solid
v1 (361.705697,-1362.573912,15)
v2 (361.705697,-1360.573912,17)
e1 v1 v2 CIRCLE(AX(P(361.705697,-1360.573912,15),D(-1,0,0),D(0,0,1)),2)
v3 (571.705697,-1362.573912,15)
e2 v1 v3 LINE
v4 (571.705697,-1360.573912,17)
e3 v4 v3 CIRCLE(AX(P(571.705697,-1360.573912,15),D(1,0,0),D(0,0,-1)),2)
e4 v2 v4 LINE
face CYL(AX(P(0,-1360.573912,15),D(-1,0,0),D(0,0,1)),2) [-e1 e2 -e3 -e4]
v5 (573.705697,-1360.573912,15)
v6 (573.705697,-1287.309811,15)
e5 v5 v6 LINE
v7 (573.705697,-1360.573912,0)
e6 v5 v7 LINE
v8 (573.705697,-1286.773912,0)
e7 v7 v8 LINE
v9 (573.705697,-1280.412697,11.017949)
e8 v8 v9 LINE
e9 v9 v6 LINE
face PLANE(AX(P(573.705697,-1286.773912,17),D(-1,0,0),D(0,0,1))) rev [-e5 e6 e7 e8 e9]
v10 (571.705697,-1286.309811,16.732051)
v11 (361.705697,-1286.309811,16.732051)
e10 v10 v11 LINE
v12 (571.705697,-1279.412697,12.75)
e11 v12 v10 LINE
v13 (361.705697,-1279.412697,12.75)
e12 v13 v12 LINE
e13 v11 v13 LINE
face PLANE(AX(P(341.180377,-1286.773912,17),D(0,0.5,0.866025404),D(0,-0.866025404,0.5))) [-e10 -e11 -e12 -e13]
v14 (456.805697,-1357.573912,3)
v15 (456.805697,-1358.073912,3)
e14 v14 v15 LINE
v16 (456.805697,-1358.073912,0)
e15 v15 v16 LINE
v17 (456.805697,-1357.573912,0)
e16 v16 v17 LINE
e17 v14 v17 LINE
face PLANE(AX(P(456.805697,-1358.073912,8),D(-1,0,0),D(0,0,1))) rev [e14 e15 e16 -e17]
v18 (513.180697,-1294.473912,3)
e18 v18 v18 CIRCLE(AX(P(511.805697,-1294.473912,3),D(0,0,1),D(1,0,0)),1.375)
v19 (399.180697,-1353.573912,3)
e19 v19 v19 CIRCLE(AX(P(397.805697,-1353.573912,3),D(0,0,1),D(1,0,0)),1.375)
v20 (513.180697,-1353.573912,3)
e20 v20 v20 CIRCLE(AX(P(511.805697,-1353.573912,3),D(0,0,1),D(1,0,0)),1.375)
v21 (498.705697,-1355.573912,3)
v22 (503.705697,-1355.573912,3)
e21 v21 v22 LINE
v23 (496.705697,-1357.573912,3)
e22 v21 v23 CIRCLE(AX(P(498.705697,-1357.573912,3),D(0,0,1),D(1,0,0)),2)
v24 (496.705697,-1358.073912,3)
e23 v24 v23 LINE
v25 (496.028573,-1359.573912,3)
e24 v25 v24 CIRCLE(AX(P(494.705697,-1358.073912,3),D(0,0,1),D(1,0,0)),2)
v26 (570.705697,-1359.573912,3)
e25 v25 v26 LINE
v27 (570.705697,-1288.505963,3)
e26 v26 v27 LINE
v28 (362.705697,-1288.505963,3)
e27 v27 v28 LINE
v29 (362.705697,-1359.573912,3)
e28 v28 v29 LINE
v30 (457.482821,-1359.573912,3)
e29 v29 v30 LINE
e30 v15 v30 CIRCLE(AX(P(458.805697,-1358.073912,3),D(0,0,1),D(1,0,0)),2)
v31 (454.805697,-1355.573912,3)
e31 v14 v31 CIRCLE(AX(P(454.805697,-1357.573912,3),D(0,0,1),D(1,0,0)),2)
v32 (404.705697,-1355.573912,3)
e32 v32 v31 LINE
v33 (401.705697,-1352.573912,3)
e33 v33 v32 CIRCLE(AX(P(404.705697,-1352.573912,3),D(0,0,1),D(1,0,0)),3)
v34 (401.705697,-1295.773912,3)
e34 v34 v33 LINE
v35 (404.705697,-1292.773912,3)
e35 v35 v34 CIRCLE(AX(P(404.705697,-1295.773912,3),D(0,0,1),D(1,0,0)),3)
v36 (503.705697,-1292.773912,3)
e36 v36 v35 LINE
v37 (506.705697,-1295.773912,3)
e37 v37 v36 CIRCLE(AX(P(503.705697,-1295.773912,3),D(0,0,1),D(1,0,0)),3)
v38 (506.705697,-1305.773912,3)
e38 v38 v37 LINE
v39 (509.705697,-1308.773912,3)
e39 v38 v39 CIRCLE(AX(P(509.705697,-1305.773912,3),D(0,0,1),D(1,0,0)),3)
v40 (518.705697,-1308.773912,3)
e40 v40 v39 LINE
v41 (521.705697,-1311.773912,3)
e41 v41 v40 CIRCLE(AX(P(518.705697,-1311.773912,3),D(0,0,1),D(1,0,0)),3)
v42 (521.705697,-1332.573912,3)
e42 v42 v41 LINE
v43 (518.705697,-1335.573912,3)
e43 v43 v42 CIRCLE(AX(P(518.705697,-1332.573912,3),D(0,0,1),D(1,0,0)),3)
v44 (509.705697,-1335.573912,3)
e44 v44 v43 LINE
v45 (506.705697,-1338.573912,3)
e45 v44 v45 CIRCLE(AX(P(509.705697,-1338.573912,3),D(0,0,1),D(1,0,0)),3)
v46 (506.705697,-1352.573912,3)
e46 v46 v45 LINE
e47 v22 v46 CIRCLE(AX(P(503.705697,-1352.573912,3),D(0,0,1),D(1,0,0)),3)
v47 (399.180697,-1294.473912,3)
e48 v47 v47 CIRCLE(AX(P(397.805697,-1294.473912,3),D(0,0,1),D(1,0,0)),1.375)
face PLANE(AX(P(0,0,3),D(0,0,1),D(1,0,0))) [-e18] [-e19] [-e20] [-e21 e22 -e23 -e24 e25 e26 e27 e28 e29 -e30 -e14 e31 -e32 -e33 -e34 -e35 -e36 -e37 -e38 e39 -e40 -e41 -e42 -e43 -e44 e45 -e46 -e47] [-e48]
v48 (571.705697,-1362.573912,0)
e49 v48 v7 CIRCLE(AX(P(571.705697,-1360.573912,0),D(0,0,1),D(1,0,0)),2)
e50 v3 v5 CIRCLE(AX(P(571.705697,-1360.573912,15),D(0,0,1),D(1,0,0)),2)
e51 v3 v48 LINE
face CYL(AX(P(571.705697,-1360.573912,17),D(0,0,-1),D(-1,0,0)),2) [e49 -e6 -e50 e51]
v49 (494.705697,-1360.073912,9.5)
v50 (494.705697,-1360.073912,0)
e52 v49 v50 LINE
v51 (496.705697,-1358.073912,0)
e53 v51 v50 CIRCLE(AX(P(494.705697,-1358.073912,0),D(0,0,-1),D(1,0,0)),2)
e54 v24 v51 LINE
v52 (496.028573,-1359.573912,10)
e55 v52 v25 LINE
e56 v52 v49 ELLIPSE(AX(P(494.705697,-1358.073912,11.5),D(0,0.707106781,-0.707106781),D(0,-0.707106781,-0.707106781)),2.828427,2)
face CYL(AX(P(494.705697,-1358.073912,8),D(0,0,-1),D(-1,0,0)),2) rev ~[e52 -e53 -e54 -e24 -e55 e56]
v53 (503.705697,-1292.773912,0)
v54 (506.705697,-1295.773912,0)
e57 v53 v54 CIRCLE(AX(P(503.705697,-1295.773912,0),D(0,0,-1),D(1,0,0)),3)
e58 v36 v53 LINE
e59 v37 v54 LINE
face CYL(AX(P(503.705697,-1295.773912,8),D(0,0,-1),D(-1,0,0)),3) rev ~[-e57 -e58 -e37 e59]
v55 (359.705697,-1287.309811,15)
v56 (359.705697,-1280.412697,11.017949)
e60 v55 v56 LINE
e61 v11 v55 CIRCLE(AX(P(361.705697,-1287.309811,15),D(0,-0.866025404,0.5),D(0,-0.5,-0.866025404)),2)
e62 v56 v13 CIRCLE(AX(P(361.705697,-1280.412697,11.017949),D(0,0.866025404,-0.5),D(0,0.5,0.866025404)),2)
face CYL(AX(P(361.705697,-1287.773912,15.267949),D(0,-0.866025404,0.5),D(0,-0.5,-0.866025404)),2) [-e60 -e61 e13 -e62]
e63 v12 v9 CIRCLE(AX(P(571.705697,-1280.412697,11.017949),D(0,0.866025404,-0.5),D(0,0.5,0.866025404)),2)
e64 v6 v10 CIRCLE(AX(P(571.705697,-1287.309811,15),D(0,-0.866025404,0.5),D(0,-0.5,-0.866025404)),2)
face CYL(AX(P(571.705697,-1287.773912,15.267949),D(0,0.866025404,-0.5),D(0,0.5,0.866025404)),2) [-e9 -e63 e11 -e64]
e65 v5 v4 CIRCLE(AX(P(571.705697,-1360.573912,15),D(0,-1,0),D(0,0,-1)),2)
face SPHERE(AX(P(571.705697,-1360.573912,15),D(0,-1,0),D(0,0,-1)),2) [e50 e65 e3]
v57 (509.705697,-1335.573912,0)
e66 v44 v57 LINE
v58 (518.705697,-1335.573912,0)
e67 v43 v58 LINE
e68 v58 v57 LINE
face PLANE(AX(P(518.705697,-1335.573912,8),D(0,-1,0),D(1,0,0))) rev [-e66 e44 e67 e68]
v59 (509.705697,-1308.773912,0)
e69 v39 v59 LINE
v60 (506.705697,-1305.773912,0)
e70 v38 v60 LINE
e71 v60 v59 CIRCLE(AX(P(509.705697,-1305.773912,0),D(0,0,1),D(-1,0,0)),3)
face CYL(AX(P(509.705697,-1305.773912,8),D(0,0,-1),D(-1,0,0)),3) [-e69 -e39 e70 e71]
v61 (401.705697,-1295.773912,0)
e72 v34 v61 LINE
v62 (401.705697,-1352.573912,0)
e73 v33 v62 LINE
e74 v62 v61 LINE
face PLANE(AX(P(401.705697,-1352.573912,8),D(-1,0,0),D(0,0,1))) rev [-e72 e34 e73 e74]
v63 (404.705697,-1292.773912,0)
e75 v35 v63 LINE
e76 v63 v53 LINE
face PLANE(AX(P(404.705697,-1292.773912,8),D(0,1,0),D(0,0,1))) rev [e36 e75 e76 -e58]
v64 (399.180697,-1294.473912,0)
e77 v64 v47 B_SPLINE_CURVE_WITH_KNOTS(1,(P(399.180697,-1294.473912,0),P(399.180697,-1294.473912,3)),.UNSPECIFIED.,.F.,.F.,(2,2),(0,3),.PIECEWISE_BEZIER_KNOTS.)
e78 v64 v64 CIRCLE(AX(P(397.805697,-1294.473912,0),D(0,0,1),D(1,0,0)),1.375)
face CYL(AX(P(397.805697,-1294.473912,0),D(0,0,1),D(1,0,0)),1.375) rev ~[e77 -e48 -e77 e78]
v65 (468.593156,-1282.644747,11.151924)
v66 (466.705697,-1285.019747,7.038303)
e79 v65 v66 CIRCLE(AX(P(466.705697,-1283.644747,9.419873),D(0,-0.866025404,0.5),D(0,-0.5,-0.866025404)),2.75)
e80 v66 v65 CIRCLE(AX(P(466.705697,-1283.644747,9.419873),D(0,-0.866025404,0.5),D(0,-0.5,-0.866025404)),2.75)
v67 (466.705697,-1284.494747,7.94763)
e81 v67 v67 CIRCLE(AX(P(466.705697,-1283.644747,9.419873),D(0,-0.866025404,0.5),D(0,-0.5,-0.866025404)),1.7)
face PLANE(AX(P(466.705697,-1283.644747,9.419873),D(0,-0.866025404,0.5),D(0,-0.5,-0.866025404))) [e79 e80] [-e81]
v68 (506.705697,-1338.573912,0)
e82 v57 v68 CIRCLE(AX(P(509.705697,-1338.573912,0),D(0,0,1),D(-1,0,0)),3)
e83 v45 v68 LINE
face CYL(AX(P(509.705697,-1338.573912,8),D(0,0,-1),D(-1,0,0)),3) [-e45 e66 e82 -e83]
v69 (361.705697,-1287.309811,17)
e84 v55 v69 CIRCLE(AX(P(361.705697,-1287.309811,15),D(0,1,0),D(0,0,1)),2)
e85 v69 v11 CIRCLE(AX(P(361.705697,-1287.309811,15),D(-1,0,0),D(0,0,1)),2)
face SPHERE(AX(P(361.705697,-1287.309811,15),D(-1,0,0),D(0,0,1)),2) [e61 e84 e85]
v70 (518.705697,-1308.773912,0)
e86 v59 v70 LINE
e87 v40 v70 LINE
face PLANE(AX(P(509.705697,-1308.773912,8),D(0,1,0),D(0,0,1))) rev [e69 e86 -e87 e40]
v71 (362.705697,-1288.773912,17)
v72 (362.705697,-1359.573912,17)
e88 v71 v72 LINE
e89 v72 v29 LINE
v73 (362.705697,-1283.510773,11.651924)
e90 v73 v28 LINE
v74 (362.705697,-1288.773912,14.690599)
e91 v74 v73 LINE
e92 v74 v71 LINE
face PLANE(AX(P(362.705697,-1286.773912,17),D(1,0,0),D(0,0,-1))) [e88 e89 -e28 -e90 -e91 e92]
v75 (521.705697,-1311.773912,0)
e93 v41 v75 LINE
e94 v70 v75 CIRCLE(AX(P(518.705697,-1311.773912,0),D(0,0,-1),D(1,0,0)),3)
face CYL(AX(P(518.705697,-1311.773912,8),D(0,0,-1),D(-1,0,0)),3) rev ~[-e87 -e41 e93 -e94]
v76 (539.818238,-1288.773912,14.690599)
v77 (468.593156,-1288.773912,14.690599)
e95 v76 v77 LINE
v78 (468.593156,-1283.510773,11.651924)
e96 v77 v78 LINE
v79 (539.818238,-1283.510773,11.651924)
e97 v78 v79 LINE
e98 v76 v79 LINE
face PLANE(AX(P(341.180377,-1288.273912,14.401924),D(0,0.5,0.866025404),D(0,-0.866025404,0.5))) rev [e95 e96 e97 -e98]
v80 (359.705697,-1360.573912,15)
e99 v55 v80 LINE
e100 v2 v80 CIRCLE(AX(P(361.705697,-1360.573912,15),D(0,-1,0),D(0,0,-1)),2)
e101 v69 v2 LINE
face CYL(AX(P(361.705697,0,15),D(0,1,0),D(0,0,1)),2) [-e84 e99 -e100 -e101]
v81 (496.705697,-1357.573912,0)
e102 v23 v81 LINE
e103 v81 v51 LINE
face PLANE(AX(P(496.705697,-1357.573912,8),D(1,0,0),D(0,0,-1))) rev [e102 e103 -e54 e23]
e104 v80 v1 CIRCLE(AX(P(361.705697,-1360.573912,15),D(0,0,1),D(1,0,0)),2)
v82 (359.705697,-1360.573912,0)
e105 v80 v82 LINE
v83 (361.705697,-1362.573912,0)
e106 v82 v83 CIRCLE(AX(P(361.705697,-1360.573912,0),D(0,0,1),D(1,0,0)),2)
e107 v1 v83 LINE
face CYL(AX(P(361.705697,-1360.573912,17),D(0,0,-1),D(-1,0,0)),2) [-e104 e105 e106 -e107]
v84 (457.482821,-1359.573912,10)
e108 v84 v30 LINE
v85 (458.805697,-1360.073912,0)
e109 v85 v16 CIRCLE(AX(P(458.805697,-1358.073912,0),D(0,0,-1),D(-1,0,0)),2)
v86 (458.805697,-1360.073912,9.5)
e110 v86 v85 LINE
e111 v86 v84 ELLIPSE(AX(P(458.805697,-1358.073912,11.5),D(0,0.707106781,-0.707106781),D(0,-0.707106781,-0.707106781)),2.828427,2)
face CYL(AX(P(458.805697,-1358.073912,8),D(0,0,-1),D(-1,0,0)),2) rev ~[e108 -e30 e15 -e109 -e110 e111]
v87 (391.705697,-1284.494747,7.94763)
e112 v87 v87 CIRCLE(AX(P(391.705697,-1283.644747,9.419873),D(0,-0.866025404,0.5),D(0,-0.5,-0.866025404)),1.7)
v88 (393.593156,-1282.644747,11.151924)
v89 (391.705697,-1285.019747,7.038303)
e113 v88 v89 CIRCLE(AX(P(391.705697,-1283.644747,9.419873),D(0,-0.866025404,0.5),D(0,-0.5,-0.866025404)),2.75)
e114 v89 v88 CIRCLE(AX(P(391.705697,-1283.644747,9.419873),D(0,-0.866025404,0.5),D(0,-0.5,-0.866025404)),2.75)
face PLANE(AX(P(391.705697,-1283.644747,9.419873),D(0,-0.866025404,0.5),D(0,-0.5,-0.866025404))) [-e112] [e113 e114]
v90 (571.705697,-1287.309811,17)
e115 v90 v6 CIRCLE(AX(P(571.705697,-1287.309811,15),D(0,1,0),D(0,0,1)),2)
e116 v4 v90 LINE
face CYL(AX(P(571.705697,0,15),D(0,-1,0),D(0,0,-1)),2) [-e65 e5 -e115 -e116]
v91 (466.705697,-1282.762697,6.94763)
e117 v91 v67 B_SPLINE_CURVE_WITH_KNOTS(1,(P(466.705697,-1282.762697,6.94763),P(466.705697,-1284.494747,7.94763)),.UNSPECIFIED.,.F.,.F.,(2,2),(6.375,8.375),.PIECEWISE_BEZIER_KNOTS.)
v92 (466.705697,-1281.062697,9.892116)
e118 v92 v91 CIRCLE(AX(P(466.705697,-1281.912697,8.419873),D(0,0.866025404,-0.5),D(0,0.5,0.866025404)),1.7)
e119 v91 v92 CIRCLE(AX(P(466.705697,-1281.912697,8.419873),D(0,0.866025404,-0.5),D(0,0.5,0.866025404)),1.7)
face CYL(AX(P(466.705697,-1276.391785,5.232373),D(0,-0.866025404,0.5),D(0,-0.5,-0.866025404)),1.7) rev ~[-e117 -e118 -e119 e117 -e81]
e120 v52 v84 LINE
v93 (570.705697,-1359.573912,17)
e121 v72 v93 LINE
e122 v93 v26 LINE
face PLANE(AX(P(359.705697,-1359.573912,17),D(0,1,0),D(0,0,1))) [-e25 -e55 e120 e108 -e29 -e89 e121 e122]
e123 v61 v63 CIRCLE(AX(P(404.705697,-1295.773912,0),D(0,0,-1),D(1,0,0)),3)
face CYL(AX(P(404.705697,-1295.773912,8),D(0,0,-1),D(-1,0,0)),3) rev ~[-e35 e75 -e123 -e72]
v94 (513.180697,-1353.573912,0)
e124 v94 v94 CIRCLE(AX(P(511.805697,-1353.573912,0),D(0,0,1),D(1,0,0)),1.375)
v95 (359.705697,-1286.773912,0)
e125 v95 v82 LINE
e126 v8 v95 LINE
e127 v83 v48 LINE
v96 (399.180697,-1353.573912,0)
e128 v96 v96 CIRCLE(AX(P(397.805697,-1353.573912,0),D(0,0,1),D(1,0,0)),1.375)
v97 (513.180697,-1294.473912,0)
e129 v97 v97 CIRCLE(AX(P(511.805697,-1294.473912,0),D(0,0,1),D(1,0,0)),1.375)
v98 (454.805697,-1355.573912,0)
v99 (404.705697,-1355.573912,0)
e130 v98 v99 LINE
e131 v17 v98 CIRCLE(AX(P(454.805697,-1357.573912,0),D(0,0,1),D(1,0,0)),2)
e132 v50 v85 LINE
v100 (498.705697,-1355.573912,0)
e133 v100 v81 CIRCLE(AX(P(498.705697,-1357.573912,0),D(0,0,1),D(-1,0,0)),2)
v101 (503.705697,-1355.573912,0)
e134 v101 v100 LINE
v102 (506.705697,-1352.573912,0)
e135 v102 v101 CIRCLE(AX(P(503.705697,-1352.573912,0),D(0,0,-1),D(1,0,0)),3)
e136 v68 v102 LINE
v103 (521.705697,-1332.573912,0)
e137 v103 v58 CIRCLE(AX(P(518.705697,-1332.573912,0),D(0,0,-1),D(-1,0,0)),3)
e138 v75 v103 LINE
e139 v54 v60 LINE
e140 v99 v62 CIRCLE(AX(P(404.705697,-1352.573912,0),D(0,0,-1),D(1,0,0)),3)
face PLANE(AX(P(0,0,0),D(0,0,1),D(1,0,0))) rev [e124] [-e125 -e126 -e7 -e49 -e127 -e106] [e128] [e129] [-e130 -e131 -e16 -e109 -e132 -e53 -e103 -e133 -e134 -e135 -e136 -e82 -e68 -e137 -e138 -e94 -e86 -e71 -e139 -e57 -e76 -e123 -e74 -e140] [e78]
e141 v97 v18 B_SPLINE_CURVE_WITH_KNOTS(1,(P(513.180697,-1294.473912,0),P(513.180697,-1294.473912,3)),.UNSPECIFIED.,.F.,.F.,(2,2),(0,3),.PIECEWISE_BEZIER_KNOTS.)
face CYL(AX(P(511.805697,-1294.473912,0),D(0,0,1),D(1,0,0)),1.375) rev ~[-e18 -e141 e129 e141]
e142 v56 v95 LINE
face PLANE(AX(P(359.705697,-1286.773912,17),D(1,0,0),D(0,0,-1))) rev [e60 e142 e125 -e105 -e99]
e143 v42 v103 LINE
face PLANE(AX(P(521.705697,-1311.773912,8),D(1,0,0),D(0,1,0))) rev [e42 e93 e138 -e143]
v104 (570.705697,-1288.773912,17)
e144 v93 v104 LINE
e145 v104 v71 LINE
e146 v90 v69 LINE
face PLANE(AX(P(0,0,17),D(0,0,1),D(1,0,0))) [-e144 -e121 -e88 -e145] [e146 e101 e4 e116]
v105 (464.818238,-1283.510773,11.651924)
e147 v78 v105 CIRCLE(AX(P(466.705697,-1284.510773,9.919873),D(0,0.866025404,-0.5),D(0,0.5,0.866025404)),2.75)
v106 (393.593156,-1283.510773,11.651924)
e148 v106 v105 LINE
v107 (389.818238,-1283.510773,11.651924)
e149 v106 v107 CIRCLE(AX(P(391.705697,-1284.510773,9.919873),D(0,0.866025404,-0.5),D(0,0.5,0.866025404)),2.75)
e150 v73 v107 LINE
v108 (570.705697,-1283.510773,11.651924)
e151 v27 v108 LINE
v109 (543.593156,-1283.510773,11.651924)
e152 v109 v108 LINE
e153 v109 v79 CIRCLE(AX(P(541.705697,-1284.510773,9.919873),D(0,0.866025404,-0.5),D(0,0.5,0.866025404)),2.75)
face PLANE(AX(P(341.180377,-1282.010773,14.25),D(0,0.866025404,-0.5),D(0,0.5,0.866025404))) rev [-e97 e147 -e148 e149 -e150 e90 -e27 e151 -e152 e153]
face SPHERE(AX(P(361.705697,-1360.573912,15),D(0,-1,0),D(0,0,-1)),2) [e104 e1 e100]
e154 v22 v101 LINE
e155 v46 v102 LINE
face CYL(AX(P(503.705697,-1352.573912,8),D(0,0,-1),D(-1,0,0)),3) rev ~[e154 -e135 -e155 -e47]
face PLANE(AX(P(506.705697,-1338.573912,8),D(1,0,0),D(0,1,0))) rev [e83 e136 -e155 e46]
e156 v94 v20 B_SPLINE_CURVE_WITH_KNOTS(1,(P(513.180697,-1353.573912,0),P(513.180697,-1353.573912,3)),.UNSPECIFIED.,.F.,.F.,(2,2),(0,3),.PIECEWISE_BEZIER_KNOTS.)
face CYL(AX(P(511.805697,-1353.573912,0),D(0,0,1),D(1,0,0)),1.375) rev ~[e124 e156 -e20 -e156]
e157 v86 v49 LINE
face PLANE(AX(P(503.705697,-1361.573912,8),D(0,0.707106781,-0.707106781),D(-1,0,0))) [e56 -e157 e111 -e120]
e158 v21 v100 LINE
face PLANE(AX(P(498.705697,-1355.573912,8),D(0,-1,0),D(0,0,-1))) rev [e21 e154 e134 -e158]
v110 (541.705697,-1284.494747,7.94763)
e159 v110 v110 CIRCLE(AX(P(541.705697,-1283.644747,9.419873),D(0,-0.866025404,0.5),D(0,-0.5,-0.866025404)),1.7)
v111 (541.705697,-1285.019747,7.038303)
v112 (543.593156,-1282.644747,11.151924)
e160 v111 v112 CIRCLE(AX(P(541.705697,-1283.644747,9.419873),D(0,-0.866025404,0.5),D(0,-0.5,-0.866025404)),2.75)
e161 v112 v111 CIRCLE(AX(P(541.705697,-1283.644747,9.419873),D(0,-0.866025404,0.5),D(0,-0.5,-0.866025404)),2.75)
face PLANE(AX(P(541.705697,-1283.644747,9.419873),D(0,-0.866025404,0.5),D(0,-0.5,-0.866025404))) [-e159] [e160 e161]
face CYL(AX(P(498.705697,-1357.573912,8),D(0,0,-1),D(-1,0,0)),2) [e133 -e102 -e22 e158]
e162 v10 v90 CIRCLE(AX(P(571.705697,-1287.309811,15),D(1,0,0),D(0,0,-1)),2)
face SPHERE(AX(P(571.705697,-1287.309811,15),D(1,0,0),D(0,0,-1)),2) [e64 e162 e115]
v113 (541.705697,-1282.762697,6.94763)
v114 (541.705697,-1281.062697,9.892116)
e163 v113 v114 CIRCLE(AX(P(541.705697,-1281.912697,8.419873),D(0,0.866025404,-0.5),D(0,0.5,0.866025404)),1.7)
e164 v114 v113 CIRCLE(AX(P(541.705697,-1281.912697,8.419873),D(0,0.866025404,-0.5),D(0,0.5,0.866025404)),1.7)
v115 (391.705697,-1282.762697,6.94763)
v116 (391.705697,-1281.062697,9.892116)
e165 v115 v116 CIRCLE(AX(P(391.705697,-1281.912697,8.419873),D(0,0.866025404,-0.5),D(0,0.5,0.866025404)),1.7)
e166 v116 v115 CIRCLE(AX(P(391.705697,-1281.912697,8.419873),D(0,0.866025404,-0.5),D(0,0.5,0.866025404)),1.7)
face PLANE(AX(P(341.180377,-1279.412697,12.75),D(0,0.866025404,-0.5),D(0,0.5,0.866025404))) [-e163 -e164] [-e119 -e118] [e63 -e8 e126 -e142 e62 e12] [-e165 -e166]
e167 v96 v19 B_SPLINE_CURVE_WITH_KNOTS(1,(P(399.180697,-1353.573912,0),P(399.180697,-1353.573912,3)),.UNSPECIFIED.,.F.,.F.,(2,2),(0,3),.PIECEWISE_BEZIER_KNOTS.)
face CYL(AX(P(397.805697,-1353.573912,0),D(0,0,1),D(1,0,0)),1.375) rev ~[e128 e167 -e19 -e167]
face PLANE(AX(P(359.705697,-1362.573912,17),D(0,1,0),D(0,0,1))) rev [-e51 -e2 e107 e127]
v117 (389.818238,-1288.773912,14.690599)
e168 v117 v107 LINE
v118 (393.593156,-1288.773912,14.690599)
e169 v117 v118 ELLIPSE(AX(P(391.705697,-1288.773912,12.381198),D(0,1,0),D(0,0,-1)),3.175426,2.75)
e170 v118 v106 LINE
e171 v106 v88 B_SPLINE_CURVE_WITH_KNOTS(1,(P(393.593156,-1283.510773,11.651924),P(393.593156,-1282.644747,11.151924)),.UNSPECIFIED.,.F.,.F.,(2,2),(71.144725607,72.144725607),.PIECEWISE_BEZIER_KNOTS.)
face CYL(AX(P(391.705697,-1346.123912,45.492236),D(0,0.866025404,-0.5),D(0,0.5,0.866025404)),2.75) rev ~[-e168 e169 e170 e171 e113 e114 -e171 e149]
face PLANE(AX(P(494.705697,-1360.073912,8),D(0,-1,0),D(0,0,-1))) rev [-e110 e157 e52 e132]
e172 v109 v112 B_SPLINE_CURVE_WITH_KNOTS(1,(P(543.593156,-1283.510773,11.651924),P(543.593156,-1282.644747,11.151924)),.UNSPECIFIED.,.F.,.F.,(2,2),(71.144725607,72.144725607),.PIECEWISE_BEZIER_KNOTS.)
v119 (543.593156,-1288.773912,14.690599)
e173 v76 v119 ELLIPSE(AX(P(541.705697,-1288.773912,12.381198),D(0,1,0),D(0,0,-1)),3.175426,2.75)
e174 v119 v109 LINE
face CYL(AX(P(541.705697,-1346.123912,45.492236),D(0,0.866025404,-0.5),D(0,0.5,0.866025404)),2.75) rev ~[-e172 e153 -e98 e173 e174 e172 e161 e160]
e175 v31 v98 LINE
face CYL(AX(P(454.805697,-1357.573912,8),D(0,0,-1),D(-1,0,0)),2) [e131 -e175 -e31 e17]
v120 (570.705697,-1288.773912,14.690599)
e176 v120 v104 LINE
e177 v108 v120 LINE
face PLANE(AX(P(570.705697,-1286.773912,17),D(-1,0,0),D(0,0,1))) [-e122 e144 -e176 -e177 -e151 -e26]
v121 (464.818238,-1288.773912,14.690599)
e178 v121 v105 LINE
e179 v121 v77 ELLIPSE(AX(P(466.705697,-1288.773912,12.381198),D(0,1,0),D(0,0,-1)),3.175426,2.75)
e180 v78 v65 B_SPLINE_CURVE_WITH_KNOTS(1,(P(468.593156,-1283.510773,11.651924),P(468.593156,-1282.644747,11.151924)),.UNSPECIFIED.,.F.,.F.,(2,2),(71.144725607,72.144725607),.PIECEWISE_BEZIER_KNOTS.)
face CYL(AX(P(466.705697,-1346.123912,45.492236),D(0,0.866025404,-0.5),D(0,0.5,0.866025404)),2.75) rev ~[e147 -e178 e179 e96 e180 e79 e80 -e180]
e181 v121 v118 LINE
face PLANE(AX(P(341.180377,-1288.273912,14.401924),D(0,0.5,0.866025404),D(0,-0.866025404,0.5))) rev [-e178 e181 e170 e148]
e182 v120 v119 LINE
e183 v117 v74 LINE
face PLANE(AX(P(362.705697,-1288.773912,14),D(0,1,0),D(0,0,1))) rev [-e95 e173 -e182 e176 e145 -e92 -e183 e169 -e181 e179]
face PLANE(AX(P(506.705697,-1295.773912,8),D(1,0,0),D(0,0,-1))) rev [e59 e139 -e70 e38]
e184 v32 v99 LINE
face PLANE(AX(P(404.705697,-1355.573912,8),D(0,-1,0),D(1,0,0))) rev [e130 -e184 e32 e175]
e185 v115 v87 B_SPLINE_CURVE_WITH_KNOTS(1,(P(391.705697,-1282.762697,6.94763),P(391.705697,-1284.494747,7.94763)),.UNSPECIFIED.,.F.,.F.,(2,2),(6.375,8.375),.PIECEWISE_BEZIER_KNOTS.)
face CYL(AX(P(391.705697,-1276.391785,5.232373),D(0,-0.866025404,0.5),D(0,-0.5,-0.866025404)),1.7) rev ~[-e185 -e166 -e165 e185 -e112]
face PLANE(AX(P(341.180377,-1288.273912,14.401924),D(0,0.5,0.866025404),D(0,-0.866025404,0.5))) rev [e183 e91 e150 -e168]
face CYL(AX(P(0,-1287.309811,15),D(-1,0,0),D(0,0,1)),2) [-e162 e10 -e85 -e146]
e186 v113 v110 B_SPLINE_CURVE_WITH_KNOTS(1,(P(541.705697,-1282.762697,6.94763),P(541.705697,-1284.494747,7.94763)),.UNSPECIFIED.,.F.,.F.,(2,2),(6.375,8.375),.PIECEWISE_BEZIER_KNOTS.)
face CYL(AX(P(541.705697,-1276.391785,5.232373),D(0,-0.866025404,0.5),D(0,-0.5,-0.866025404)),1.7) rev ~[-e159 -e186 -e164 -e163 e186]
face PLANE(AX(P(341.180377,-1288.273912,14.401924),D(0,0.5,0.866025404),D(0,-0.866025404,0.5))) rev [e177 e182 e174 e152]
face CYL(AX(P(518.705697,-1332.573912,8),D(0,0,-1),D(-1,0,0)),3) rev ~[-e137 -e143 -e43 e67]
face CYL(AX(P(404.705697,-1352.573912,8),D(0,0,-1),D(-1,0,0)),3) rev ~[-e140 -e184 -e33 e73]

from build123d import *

# Parameters (mm, degrees)
SKETCH1_W               = 214
SKETCH1_H               = 75.8
BOSS_EXTRUDE1_DEPTH     = 17
BOSSEXTENTION_DEPTH     = 214
SHELLIT_T               = -3
SKETCH7_W               = 208
SKETCH7_H               = 4
CUT_EXTRUDE4_DEPTH      = 3
SKETCH3_R               = 1.375
MOUNTING_HOLES_DEPTH    = 1479.493115905
PI_HOLE_DEPTH           = 8
CHAMFER1_START          = 8
CHAMFER1_DEPTH          = 2
CHAMFER1_START_2        = -970
CHAMFER1_2_DEPTH        = 1.564999152
FILLET1_R               = 2
SKETCH11_R              = 1.7
CUT_EXTRUDE5_DEPTH      = 893.868694268
CUT_EXTRUDE6_DEPTH      = 893.868694268
CUT_EXTRUDE6_DEPTH_BACK = 1
SKETCH12_R              = 2.75


with BuildPart() as part:
    # Sketch1 → Boss-Extrude1 (new body)
    with BuildSketch(Plane.XY):
        with Locations((466.705697041, -1324.673912477)):
            Rectangle(SKETCH1_W, SKETCH1_H)
    extrude(amount=BOSS_EXTRUDE1_DEPTH)

    # Sketch6 → BossExtention (add)
    with BuildSketch(Plane(origin=(573.705697041, 0, 0), x_dir=(0, 0, -1), z_dir=(1, 0, 0))):
        Polygon((-17, -1286.773912477), (-12.75, -1279.412696544), (0, -1286.773912477), align=None)
    extrude(amount=-BOSSEXTENTION_DEPTH)

    # Shellit
    shellit_openings = [part.faces().sort_by_distance(p)[0] for p in [
        (466.705697041, -1324.673912477, 17),
    ]]
    offset(amount=SHELLIT_T, openings=shellit_openings, kind=Kind.INTERSECTION)

    # Sketch7 → Cut-Extrude4 (cut)
    with BuildSketch(Plane.XY.offset(17)):
        with Locations((466.705697041, -1290.773912477)):
            Rectangle(SKETCH7_W, SKETCH7_H)
    extrude(amount=-CUT_EXTRUDE4_DEPTH, mode=Mode.SUBTRACT)

    # Sketch3 → Mounting Holes (cut, through all)
    with BuildSketch(Plane.XY.offset(3)):
        with Locations((397.805697041, -1294.473912477)):
            Circle(SKETCH3_R)
        with Locations((511.805697041, -1294.473912477)):
            Circle(SKETCH3_R)
        with Locations((397.805697041, -1353.573912477)):
            Circle(SKETCH3_R)
        with Locations((511.805697041, -1353.573912477)):
            Circle(SKETCH3_R)
    extrude(amount=-MOUNTING_HOLES_DEPTH, mode=Mode.SUBTRACT)

    # Sketch4 → PI_Hole (cut)
    with BuildSketch(Plane(origin=(0, 0, 0), x_dir=(-1, 0, 0), z_dir=(0, 0, -1))):
        with BuildLine():
            Line((-404.705697041, -1355.573912477), (-454.805697041, -1355.573912477))
            ThreePointArc((-454.805697041, -1355.573912477), (-456.219910604, -1356.159698914), (-456.805697041, -1357.573912477))
            Line((-456.805697041, -1357.573912477), (-456.805697041, -1358.073912477))
            ThreePointArc((-456.805697041, -1358.073912477), (-457.391483479, -1359.488126039), (-458.805697041, -1360.073912477))
            Line((-458.805697041, -1360.073912477), (-494.705697041, -1360.073912477))
            ThreePointArc((-494.705697041, -1360.073912477), (-496.119910604, -1359.488126039), (-496.705697041, -1358.073912477))
            Line((-496.705697041, -1358.073912477), (-496.705697041, -1357.573912477))
            ThreePointArc((-496.705697041, -1357.573912477), (-497.291483479, -1356.159698914), (-498.705697041, -1355.573912477))
            Line((-498.705697041, -1355.573912477), (-503.705697041, -1355.573912477))
            ThreePointArc((-503.705697041, -1355.573912477), (-505.827017385, -1354.69523282), (-506.705697041, -1352.573912477))
            Line((-506.705697041, -1352.573912477), (-506.705697041, -1338.573912477))
            ThreePointArc((-506.705697041, -1338.573912477), (-507.584376698, -1336.452592133), (-509.705697041, -1335.573912477))
            Line((-509.705697041, -1335.573912477), (-518.705697041, -1335.573912477))
            ThreePointArc((-518.705697041, -1335.573912477), (-520.827017385, -1334.69523282), (-521.705697041, -1332.573912477))
            Line((-521.705697041, -1332.573912477), (-521.705697041, -1311.773912477))
            ThreePointArc((-521.705697041, -1311.773912477), (-520.827017385, -1309.652592133), (-518.705697041, -1308.773912477))
            Line((-518.705697041, -1308.773912477), (-509.705697041, -1308.773912477))
            ThreePointArc((-509.705697041, -1308.773912477), (-507.584376698, -1307.89523282), (-506.705697041, -1305.773912477))
            Line((-506.705697041, -1305.773912477), (-506.705697041, -1295.773912477))
            ThreePointArc((-506.705697041, -1295.773912477), (-505.827017385, -1293.652592133), (-503.705697041, -1292.773912477))
            Line((-503.705697041, -1292.773912477), (-404.705697041, -1292.773912477))
            ThreePointArc((-404.705697041, -1292.773912477), (-402.584376698, -1293.652592133), (-401.705697041, -1295.773912477))
            Line((-401.705697041, -1295.773912477), (-401.705697041, -1352.573912477))
            ThreePointArc((-401.705697041, -1352.573912477), (-402.584376698, -1354.69523282), (-404.705697041, -1355.573912477))
        make_face()
    extrude(amount=-PI_HOLE_DEPTH, mode=Mode.SUBTRACT)

    # Chamfer1: read off the stored shape, not the designer's step
    # Chamfer1 outline → Chamfer1 (cut)
    with BuildSketch(Plane.XY.offset(CHAMFER1_START)):
        with BuildLine():
            ThreePointArc((457.482821386, -1359.573912477), (458.09859026, -1359.94474117), (458.805697041, -1360.073912477))
            Line((458.805697041, -1360.073912477), (494.705697041, -1360.073912477))
            ThreePointArc((494.705697041, -1360.073912477), (495.412803822, -1359.94474117), (496.028572697, -1359.573912477))
            Line((496.028572697, -1359.573912477), (457.482821386, -1359.573912477))
        make_face()
    extrude(amount=CHAMFER1_DEPTH, mode=Mode.SUBTRACT)

    # Chamfer1 2 outline → Chamfer1 2 (add)
    with BuildSketch(Plane(origin=(0, 0, 0), x_dir=(1, 0, 0), z_dir=(0, 0.70710678118655, -0.707106781186545)).offset(CHAMFER1_START_2)):
        with BuildLine():
            Line((494.705697041, 954.999972006), (458.805697041, 954.999972006))
            add(Edge.make_bspline(
                [(458.805697041, 954.999972006), (458.049768095, 954.999972006), (457.482821386, 954.292865225)],
                knots=[0, 0, 0, 0.722734248, 0.722734248, 0.722734248], degree=2, weights=[1, 0.935414347, 1]))
            Line((457.482821386, 954.292865225), (496.028572697, 954.292865225))
            add(Edge.make_bspline(
                [(496.028572697, 954.292865225), (495.461625987, 954.999972006), (494.705697041, 954.999972006)],
                knots=[5.560451059, 5.560451059, 5.560451059, 6.283185307, 6.283185307, 6.283185307], degree=2, weights=[1, 0.935414347, 1]))
        make_face()
    extrude(amount=CHAMFER1_2_DEPTH)

    # Fillet1
    fillet1_edges = [part.edges().sort_by_distance(p)[0] for p in [
        (359.705697041, -1324.673912477, 17),
        (573.705697041, -1283.09330451, 14.875),
        (359.705697041, -1283.09330451, 14.875),
        (466.705697041, -1362.573912477, 17),
        (573.705697041, -1324.673912477, 17),
        (573.705697041, -1362.573912477, 8.5),
        (359.705697041, -1362.573912477, 8.5),
        (466.705697041, -1286.773912477, 17),
    ]]
    fillet(fillet1_edges, radius=FILLET1_R)

    # Sketch11 → Cut-Extrude5 (cut, through all)
    with BuildSketch(Plane(origin=(0, -967.678510569, 558.689448566), x_dir=(1, 0, 0), z_dir=(0, -0.8660254037844403, 0.499999999999997))):
        with Locations(Location((466.705697041, -633.664524374, 0), (0, 0, 270))):
            Circle(SKETCH11_R)
        with Locations(Location((541.705697041, -633.664524374, 0), (0, 0, 270))):
            Circle(SKETCH11_R)
        with Locations(Location((391.705697041, -633.664524374, 0), (0, 0, 270))):
            Circle(SKETCH11_R)
    extrude(amount=-CUT_EXTRUDE5_DEPTH, mode=Mode.SUBTRACT)

    # Sketch12 → Cut-Extrude6 (cut, two sides: drawn at the far end of the back side and taken through both)
    with BuildSketch(Plane(origin=(0, -967.678510569, 558.689448566), x_dir=(1, 0, 0), z_dir=(0, -0.8660254037844403, 0.499999999999997)).offset(-CUT_EXTRUDE6_DEPTH_BACK)):
        with Locations(Location((391.705697041, -633.664524374, 0), (0, 0, 46.658241773))):
            Circle(SKETCH12_R)
        with Locations(Location((466.705697041, -633.664524374, 0), (0, 0, 46.658241773))):
            Circle(SKETCH12_R)
        with Locations(Location((541.705697041, -633.664524374, 0), (0, 0, 46.658241773))):
            Circle(SKETCH12_R)
    extrude(amount=CUT_EXTRUDE6_DEPTH + CUT_EXTRUDE6_DEPTH_BACK, mode=Mode.SUBTRACT)


solid = part.part
